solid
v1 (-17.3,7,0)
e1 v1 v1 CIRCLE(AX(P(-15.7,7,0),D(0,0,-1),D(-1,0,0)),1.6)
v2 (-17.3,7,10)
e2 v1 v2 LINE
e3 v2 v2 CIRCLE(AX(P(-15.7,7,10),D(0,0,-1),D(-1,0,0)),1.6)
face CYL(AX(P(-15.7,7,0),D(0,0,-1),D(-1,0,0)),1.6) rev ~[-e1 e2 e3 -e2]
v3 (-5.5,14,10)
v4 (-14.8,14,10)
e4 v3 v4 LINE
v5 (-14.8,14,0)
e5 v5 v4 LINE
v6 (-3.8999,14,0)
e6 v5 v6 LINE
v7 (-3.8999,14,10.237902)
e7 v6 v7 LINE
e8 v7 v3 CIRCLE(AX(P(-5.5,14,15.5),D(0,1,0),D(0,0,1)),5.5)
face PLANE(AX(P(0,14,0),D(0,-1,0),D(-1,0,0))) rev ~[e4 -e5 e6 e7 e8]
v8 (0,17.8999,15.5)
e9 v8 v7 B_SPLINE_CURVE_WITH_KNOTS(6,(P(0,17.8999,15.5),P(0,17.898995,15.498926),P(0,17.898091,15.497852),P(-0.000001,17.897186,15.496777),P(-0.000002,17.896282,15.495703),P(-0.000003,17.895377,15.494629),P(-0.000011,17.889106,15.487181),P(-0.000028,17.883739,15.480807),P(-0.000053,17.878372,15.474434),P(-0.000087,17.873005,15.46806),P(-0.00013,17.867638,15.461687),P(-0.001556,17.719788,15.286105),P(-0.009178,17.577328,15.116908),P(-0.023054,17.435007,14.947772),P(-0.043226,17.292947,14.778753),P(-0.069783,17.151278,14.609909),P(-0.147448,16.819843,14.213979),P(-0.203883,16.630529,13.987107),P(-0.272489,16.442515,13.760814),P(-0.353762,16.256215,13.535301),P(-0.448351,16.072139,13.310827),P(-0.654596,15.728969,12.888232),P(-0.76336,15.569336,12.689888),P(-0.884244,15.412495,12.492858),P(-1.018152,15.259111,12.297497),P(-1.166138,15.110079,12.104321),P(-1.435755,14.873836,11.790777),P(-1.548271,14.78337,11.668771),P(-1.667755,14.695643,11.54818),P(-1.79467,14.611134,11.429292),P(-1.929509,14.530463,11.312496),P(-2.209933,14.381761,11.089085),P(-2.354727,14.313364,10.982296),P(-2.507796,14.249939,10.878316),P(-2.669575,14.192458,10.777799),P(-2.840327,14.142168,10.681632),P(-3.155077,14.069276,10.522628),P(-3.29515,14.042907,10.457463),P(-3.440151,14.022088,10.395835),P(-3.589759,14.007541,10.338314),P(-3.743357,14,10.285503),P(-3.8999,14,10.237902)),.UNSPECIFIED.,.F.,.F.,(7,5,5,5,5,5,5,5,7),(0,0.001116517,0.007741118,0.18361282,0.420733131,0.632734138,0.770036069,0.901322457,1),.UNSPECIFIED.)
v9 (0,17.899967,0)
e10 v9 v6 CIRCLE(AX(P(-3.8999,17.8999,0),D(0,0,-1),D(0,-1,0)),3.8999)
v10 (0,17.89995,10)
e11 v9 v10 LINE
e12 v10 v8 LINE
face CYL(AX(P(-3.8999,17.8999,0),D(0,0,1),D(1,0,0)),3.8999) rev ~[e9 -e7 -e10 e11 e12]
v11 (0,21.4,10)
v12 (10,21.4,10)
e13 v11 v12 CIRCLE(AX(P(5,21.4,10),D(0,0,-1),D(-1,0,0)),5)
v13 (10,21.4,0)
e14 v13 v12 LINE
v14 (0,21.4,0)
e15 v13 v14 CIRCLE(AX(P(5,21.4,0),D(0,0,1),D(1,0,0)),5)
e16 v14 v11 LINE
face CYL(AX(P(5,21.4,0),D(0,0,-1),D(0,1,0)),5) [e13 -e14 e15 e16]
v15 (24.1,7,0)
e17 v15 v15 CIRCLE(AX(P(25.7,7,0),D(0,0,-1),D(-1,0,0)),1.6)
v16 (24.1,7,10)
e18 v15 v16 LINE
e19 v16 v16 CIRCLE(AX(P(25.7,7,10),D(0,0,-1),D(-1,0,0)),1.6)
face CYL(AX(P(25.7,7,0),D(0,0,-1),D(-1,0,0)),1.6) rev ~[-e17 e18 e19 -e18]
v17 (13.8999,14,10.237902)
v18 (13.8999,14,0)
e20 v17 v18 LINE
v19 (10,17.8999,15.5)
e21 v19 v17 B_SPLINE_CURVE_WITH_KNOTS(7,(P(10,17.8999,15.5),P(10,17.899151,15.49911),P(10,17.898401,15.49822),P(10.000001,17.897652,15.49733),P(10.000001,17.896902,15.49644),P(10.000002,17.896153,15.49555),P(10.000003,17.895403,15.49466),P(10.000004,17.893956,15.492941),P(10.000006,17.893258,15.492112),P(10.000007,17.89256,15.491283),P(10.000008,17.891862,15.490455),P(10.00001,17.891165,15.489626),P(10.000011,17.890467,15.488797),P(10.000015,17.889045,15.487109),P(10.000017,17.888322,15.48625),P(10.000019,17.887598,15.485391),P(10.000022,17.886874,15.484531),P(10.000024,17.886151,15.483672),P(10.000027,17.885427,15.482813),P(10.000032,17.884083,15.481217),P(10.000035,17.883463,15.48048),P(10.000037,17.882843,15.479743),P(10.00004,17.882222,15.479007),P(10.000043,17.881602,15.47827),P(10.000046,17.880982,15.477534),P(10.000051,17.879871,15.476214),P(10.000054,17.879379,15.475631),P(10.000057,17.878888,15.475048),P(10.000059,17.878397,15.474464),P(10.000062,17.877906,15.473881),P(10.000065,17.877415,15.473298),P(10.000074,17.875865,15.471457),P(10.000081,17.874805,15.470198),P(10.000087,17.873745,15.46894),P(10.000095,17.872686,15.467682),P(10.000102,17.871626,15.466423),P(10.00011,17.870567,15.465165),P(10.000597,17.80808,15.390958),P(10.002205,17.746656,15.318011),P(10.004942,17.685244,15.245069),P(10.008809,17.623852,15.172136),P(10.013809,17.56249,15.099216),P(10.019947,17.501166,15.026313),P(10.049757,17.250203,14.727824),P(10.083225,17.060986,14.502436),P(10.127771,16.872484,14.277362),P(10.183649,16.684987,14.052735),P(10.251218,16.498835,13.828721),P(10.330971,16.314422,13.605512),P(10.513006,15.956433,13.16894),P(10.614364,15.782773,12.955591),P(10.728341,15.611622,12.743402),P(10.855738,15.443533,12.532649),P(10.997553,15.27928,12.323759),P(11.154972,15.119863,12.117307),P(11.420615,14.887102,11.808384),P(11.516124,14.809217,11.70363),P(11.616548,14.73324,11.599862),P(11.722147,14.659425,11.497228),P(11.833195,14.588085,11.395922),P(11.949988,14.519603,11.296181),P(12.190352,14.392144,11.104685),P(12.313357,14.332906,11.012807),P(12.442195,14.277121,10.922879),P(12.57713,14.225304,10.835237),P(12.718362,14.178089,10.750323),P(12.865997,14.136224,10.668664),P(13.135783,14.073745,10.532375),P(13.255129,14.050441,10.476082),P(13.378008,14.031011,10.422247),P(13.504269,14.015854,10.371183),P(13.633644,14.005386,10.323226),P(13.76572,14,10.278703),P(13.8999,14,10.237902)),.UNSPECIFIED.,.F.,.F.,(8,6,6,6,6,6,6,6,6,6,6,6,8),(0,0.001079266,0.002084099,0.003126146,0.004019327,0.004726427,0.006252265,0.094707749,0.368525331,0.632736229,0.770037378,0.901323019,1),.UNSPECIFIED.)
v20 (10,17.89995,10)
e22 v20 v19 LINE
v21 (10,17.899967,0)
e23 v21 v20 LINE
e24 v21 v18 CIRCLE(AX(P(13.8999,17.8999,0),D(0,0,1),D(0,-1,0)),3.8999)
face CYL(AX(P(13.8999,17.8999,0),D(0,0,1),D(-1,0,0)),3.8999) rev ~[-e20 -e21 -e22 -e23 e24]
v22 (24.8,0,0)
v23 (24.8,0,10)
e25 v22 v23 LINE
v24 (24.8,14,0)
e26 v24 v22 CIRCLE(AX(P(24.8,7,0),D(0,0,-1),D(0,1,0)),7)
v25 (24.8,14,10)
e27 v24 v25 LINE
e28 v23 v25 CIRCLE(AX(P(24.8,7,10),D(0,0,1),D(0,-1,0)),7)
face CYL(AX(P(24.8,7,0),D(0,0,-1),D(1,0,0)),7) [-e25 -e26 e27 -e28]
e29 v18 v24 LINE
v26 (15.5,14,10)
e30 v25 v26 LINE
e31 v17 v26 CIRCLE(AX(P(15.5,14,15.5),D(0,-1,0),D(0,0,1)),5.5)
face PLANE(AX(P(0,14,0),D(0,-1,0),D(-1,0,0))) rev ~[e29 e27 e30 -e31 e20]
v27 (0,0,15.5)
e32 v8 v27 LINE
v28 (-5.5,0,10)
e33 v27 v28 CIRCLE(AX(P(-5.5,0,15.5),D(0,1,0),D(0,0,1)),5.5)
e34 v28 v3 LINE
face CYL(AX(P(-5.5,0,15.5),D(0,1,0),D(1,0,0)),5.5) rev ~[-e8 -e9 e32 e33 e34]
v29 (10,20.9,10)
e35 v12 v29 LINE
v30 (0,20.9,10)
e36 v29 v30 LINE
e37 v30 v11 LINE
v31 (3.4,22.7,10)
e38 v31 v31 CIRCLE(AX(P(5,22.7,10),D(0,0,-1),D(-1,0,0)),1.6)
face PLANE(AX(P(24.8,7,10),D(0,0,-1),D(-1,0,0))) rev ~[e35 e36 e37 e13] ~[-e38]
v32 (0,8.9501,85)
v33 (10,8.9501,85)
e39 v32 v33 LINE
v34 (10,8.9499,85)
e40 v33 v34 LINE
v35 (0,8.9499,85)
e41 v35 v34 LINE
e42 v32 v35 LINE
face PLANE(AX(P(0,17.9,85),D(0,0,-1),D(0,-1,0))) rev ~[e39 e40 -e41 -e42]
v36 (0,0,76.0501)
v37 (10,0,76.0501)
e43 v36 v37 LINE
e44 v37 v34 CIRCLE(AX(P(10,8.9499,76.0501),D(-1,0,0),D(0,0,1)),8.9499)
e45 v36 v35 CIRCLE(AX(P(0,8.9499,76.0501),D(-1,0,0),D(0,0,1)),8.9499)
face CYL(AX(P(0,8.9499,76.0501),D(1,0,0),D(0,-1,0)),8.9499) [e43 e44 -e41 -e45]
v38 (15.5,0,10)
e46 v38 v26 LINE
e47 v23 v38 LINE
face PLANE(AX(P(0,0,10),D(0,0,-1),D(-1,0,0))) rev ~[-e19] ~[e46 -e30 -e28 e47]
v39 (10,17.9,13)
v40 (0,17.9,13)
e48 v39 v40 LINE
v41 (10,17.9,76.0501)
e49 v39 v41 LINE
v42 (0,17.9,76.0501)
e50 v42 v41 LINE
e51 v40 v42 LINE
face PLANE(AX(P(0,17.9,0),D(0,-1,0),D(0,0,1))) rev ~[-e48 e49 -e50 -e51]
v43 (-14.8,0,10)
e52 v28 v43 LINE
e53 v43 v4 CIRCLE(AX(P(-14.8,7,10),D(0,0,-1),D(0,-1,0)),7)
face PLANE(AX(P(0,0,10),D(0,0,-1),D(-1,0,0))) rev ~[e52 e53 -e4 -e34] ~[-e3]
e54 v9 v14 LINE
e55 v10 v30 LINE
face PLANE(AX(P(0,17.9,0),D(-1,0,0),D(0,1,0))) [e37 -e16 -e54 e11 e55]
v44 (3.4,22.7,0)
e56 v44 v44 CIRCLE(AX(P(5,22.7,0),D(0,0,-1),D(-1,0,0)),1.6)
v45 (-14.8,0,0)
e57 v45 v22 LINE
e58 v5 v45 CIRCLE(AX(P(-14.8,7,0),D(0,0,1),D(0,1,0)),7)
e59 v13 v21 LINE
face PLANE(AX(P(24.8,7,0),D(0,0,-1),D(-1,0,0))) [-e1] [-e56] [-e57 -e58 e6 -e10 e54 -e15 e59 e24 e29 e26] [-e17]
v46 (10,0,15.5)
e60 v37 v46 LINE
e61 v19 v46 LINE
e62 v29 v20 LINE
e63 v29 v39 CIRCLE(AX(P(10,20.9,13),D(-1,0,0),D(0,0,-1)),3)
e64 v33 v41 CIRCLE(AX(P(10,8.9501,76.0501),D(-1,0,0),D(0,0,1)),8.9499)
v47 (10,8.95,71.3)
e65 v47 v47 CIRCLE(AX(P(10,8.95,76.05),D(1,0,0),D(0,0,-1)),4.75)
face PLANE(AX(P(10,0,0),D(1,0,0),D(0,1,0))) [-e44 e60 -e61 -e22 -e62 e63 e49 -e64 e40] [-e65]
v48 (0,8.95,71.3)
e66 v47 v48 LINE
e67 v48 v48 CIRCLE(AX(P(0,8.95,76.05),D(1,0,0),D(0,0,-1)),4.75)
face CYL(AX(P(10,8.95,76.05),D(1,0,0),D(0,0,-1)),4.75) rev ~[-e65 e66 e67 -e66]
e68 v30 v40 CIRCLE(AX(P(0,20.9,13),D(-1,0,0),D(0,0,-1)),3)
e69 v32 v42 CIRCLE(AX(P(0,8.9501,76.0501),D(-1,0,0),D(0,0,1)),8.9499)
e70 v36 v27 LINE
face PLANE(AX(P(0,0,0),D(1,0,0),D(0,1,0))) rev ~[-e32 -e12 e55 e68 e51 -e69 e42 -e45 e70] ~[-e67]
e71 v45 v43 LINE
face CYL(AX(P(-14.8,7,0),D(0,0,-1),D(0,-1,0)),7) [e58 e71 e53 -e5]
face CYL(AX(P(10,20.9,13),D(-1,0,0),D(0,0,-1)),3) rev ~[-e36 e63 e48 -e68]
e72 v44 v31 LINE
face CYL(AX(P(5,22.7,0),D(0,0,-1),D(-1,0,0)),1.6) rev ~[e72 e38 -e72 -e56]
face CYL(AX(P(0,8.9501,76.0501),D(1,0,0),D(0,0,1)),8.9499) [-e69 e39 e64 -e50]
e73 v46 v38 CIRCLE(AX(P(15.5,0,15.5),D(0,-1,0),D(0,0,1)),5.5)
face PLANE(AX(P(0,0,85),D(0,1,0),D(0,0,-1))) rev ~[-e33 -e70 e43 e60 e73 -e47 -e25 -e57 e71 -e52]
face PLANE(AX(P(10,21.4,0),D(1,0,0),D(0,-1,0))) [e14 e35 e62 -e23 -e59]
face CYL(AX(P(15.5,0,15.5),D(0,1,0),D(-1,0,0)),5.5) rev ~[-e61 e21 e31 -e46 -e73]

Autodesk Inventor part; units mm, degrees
ref_plane "YZ Plane" through (0, 0, 0) normal (1, 0, 0) x (0, 1, 0)
ref_plane "XZ Plane" through (0, 0, 0) normal (0, 1, 0) x (-1, 0, 0)
ref_plane "XY Plane" through (0, 0, 0) normal (0, 0, 1) x (1, 0, 0)
sketch "Sketch1" plane through (0, 0, 0) normal (1, 0, 0) x (0, 1, 0)
  line L0 (0, 0) -> (17.9, 0)
  line L1 (17.9, 0) -> (17.9, 85)
  line L2 (17.9, 85) -> (0, 85)
  line L3 (0, 85) -> (0, 0)
  dimension "d0" = 17.9
  dimension "d1" = 85
extrude "Extrusion1" add sketch "Sketch1" along normal blind 10
fillet "Fillet1" radius 8.95 2 edges at (5, 17.9, 85) (5, 0, 85)
sketch "Sketch2" plane through (10, 0, 0) normal (1, 0, 0) x (0, 0, -1)
  arc A0 (-76.05, 17.9) -> (-76.05, 0) centre (-76.05, 8.95) ccw projected
  circle A1 centre (-76.05, 8.95) radius 4.75
  point P0 (0, 0)
  dimension "d5" = 9.5
extrude "Extrusion2" cut sketch "Sketch2" against normal blind 10
sketch "Sketch3" plane through (0, 0, 0) normal (0, 0, -1) x (-1, 0, 0)
  line L0 (14.8, 0) -> (-24.8, 0)
  line L1 (-31.8, 7) -> (-31.8, 7)
  line L2 (-24.8, 14) -> (14.8, 14)
  line L3 (21.8, 7) -> (21.8, 7)
  line L4 (0, 0) -> (0, 17.9) projected
  line L5 (-10, 0) -> (-10, 17.9) projected
  line L6 (0, 17.9) -> (-10, 17.9) projected
  circle A0 centre (-25.7, 7) radius 1.6
  circle A1 centre (15.7, 7) radius 1.6
  arc A2 (-24.8, 14) -> (-31.8, 7) centre (-24.8, 7) ccw
  arc A3 (-31.8, 7) -> (-24.8, 0) centre (-24.8, 7) ccw
  arc A4 (21.8, 7) -> (14.8, 14) centre (14.8, 7) ccw
  arc A5 (14.8, 0) -> (21.8, 7) centre (14.8, 7) ccw
  point P0 (21.8, 0)
  point P1 (-31.8, 14)
  point P2 (-31.8, 0)
  point P3 (21.8, 14)
  point P4 (-10, 14)
  point P5 (0, 14)
  point P6 (21.8, 7)
  point P7 (-31.8, 7)
  dimension "d8" = 14
  dimension "d9" = 21.8
  dimension "d10" = 21.8
  dimension "d11" = 17.9
  dimension "d12" = 3.2
  dimension "d13" = 3.2
  dimension "d14" = 6.1
  dimension "d15" = 6.1
  dimension "d16" = 7
  dimension "d17" = 7
  dimension "d23" = 7
extrude "Extrusion3" add sketch "Sketch3" against normal blind 10 contours L0 L4 L2 A4 A5 | L0 L5 L2 L4 | L0 A3 A2 L2 L5
fillet "Fillet3" radius 5.5 2 edges at (10, 7, 10) (0, 7, 10)
fillet "Fillet4" radius 3.9 4 edges at (0, 14, 12.75) (0, 14, 5) (10, 14, 12.75) (10, 14, 5)
sketch "Sketch4" plane through (24.8, 7, 0) normal (0, 0, -1) x (-1, 0, 0)
  line L0 (14.8, 10.9) -> (14.8, -7) projected
  line L1 (14.8, 10.9) -> (24.8, 10.9)
  line L2 (24.8, 10.9) -> (24.8, 14.4)
  line L3 (19.8, 19.4) -> (19.8, 19.4)
  line L4 (14.8, 14.4) -> (14.8, 10.9)
  circle A0 centre (19.8, 15.7) radius 1.6
  arc A1 (19.8, 19.4) -> (14.8, 14.4) centre (19.8, 14.4) ccw
  arc A2 (24.8, 14.4) -> (19.8, 19.4) centre (19.8, 14.4) ccw
  point P0 (24.8, -7)
  point P1 (24.8, 19.4)
  point P2 (19.8, 19.4)
  dimension "d24" = 8.5
  dimension "d25" = 3.2
  dimension "d26" = 4.8
  dimension "d27" = 5
extrude "Extrusion4" add sketch "Sketch4" against normal blind 10
fillet "Fillet5" radius 3 1 edges at (5, 17.9, 10)
properties part number "Motor Mount V2"
